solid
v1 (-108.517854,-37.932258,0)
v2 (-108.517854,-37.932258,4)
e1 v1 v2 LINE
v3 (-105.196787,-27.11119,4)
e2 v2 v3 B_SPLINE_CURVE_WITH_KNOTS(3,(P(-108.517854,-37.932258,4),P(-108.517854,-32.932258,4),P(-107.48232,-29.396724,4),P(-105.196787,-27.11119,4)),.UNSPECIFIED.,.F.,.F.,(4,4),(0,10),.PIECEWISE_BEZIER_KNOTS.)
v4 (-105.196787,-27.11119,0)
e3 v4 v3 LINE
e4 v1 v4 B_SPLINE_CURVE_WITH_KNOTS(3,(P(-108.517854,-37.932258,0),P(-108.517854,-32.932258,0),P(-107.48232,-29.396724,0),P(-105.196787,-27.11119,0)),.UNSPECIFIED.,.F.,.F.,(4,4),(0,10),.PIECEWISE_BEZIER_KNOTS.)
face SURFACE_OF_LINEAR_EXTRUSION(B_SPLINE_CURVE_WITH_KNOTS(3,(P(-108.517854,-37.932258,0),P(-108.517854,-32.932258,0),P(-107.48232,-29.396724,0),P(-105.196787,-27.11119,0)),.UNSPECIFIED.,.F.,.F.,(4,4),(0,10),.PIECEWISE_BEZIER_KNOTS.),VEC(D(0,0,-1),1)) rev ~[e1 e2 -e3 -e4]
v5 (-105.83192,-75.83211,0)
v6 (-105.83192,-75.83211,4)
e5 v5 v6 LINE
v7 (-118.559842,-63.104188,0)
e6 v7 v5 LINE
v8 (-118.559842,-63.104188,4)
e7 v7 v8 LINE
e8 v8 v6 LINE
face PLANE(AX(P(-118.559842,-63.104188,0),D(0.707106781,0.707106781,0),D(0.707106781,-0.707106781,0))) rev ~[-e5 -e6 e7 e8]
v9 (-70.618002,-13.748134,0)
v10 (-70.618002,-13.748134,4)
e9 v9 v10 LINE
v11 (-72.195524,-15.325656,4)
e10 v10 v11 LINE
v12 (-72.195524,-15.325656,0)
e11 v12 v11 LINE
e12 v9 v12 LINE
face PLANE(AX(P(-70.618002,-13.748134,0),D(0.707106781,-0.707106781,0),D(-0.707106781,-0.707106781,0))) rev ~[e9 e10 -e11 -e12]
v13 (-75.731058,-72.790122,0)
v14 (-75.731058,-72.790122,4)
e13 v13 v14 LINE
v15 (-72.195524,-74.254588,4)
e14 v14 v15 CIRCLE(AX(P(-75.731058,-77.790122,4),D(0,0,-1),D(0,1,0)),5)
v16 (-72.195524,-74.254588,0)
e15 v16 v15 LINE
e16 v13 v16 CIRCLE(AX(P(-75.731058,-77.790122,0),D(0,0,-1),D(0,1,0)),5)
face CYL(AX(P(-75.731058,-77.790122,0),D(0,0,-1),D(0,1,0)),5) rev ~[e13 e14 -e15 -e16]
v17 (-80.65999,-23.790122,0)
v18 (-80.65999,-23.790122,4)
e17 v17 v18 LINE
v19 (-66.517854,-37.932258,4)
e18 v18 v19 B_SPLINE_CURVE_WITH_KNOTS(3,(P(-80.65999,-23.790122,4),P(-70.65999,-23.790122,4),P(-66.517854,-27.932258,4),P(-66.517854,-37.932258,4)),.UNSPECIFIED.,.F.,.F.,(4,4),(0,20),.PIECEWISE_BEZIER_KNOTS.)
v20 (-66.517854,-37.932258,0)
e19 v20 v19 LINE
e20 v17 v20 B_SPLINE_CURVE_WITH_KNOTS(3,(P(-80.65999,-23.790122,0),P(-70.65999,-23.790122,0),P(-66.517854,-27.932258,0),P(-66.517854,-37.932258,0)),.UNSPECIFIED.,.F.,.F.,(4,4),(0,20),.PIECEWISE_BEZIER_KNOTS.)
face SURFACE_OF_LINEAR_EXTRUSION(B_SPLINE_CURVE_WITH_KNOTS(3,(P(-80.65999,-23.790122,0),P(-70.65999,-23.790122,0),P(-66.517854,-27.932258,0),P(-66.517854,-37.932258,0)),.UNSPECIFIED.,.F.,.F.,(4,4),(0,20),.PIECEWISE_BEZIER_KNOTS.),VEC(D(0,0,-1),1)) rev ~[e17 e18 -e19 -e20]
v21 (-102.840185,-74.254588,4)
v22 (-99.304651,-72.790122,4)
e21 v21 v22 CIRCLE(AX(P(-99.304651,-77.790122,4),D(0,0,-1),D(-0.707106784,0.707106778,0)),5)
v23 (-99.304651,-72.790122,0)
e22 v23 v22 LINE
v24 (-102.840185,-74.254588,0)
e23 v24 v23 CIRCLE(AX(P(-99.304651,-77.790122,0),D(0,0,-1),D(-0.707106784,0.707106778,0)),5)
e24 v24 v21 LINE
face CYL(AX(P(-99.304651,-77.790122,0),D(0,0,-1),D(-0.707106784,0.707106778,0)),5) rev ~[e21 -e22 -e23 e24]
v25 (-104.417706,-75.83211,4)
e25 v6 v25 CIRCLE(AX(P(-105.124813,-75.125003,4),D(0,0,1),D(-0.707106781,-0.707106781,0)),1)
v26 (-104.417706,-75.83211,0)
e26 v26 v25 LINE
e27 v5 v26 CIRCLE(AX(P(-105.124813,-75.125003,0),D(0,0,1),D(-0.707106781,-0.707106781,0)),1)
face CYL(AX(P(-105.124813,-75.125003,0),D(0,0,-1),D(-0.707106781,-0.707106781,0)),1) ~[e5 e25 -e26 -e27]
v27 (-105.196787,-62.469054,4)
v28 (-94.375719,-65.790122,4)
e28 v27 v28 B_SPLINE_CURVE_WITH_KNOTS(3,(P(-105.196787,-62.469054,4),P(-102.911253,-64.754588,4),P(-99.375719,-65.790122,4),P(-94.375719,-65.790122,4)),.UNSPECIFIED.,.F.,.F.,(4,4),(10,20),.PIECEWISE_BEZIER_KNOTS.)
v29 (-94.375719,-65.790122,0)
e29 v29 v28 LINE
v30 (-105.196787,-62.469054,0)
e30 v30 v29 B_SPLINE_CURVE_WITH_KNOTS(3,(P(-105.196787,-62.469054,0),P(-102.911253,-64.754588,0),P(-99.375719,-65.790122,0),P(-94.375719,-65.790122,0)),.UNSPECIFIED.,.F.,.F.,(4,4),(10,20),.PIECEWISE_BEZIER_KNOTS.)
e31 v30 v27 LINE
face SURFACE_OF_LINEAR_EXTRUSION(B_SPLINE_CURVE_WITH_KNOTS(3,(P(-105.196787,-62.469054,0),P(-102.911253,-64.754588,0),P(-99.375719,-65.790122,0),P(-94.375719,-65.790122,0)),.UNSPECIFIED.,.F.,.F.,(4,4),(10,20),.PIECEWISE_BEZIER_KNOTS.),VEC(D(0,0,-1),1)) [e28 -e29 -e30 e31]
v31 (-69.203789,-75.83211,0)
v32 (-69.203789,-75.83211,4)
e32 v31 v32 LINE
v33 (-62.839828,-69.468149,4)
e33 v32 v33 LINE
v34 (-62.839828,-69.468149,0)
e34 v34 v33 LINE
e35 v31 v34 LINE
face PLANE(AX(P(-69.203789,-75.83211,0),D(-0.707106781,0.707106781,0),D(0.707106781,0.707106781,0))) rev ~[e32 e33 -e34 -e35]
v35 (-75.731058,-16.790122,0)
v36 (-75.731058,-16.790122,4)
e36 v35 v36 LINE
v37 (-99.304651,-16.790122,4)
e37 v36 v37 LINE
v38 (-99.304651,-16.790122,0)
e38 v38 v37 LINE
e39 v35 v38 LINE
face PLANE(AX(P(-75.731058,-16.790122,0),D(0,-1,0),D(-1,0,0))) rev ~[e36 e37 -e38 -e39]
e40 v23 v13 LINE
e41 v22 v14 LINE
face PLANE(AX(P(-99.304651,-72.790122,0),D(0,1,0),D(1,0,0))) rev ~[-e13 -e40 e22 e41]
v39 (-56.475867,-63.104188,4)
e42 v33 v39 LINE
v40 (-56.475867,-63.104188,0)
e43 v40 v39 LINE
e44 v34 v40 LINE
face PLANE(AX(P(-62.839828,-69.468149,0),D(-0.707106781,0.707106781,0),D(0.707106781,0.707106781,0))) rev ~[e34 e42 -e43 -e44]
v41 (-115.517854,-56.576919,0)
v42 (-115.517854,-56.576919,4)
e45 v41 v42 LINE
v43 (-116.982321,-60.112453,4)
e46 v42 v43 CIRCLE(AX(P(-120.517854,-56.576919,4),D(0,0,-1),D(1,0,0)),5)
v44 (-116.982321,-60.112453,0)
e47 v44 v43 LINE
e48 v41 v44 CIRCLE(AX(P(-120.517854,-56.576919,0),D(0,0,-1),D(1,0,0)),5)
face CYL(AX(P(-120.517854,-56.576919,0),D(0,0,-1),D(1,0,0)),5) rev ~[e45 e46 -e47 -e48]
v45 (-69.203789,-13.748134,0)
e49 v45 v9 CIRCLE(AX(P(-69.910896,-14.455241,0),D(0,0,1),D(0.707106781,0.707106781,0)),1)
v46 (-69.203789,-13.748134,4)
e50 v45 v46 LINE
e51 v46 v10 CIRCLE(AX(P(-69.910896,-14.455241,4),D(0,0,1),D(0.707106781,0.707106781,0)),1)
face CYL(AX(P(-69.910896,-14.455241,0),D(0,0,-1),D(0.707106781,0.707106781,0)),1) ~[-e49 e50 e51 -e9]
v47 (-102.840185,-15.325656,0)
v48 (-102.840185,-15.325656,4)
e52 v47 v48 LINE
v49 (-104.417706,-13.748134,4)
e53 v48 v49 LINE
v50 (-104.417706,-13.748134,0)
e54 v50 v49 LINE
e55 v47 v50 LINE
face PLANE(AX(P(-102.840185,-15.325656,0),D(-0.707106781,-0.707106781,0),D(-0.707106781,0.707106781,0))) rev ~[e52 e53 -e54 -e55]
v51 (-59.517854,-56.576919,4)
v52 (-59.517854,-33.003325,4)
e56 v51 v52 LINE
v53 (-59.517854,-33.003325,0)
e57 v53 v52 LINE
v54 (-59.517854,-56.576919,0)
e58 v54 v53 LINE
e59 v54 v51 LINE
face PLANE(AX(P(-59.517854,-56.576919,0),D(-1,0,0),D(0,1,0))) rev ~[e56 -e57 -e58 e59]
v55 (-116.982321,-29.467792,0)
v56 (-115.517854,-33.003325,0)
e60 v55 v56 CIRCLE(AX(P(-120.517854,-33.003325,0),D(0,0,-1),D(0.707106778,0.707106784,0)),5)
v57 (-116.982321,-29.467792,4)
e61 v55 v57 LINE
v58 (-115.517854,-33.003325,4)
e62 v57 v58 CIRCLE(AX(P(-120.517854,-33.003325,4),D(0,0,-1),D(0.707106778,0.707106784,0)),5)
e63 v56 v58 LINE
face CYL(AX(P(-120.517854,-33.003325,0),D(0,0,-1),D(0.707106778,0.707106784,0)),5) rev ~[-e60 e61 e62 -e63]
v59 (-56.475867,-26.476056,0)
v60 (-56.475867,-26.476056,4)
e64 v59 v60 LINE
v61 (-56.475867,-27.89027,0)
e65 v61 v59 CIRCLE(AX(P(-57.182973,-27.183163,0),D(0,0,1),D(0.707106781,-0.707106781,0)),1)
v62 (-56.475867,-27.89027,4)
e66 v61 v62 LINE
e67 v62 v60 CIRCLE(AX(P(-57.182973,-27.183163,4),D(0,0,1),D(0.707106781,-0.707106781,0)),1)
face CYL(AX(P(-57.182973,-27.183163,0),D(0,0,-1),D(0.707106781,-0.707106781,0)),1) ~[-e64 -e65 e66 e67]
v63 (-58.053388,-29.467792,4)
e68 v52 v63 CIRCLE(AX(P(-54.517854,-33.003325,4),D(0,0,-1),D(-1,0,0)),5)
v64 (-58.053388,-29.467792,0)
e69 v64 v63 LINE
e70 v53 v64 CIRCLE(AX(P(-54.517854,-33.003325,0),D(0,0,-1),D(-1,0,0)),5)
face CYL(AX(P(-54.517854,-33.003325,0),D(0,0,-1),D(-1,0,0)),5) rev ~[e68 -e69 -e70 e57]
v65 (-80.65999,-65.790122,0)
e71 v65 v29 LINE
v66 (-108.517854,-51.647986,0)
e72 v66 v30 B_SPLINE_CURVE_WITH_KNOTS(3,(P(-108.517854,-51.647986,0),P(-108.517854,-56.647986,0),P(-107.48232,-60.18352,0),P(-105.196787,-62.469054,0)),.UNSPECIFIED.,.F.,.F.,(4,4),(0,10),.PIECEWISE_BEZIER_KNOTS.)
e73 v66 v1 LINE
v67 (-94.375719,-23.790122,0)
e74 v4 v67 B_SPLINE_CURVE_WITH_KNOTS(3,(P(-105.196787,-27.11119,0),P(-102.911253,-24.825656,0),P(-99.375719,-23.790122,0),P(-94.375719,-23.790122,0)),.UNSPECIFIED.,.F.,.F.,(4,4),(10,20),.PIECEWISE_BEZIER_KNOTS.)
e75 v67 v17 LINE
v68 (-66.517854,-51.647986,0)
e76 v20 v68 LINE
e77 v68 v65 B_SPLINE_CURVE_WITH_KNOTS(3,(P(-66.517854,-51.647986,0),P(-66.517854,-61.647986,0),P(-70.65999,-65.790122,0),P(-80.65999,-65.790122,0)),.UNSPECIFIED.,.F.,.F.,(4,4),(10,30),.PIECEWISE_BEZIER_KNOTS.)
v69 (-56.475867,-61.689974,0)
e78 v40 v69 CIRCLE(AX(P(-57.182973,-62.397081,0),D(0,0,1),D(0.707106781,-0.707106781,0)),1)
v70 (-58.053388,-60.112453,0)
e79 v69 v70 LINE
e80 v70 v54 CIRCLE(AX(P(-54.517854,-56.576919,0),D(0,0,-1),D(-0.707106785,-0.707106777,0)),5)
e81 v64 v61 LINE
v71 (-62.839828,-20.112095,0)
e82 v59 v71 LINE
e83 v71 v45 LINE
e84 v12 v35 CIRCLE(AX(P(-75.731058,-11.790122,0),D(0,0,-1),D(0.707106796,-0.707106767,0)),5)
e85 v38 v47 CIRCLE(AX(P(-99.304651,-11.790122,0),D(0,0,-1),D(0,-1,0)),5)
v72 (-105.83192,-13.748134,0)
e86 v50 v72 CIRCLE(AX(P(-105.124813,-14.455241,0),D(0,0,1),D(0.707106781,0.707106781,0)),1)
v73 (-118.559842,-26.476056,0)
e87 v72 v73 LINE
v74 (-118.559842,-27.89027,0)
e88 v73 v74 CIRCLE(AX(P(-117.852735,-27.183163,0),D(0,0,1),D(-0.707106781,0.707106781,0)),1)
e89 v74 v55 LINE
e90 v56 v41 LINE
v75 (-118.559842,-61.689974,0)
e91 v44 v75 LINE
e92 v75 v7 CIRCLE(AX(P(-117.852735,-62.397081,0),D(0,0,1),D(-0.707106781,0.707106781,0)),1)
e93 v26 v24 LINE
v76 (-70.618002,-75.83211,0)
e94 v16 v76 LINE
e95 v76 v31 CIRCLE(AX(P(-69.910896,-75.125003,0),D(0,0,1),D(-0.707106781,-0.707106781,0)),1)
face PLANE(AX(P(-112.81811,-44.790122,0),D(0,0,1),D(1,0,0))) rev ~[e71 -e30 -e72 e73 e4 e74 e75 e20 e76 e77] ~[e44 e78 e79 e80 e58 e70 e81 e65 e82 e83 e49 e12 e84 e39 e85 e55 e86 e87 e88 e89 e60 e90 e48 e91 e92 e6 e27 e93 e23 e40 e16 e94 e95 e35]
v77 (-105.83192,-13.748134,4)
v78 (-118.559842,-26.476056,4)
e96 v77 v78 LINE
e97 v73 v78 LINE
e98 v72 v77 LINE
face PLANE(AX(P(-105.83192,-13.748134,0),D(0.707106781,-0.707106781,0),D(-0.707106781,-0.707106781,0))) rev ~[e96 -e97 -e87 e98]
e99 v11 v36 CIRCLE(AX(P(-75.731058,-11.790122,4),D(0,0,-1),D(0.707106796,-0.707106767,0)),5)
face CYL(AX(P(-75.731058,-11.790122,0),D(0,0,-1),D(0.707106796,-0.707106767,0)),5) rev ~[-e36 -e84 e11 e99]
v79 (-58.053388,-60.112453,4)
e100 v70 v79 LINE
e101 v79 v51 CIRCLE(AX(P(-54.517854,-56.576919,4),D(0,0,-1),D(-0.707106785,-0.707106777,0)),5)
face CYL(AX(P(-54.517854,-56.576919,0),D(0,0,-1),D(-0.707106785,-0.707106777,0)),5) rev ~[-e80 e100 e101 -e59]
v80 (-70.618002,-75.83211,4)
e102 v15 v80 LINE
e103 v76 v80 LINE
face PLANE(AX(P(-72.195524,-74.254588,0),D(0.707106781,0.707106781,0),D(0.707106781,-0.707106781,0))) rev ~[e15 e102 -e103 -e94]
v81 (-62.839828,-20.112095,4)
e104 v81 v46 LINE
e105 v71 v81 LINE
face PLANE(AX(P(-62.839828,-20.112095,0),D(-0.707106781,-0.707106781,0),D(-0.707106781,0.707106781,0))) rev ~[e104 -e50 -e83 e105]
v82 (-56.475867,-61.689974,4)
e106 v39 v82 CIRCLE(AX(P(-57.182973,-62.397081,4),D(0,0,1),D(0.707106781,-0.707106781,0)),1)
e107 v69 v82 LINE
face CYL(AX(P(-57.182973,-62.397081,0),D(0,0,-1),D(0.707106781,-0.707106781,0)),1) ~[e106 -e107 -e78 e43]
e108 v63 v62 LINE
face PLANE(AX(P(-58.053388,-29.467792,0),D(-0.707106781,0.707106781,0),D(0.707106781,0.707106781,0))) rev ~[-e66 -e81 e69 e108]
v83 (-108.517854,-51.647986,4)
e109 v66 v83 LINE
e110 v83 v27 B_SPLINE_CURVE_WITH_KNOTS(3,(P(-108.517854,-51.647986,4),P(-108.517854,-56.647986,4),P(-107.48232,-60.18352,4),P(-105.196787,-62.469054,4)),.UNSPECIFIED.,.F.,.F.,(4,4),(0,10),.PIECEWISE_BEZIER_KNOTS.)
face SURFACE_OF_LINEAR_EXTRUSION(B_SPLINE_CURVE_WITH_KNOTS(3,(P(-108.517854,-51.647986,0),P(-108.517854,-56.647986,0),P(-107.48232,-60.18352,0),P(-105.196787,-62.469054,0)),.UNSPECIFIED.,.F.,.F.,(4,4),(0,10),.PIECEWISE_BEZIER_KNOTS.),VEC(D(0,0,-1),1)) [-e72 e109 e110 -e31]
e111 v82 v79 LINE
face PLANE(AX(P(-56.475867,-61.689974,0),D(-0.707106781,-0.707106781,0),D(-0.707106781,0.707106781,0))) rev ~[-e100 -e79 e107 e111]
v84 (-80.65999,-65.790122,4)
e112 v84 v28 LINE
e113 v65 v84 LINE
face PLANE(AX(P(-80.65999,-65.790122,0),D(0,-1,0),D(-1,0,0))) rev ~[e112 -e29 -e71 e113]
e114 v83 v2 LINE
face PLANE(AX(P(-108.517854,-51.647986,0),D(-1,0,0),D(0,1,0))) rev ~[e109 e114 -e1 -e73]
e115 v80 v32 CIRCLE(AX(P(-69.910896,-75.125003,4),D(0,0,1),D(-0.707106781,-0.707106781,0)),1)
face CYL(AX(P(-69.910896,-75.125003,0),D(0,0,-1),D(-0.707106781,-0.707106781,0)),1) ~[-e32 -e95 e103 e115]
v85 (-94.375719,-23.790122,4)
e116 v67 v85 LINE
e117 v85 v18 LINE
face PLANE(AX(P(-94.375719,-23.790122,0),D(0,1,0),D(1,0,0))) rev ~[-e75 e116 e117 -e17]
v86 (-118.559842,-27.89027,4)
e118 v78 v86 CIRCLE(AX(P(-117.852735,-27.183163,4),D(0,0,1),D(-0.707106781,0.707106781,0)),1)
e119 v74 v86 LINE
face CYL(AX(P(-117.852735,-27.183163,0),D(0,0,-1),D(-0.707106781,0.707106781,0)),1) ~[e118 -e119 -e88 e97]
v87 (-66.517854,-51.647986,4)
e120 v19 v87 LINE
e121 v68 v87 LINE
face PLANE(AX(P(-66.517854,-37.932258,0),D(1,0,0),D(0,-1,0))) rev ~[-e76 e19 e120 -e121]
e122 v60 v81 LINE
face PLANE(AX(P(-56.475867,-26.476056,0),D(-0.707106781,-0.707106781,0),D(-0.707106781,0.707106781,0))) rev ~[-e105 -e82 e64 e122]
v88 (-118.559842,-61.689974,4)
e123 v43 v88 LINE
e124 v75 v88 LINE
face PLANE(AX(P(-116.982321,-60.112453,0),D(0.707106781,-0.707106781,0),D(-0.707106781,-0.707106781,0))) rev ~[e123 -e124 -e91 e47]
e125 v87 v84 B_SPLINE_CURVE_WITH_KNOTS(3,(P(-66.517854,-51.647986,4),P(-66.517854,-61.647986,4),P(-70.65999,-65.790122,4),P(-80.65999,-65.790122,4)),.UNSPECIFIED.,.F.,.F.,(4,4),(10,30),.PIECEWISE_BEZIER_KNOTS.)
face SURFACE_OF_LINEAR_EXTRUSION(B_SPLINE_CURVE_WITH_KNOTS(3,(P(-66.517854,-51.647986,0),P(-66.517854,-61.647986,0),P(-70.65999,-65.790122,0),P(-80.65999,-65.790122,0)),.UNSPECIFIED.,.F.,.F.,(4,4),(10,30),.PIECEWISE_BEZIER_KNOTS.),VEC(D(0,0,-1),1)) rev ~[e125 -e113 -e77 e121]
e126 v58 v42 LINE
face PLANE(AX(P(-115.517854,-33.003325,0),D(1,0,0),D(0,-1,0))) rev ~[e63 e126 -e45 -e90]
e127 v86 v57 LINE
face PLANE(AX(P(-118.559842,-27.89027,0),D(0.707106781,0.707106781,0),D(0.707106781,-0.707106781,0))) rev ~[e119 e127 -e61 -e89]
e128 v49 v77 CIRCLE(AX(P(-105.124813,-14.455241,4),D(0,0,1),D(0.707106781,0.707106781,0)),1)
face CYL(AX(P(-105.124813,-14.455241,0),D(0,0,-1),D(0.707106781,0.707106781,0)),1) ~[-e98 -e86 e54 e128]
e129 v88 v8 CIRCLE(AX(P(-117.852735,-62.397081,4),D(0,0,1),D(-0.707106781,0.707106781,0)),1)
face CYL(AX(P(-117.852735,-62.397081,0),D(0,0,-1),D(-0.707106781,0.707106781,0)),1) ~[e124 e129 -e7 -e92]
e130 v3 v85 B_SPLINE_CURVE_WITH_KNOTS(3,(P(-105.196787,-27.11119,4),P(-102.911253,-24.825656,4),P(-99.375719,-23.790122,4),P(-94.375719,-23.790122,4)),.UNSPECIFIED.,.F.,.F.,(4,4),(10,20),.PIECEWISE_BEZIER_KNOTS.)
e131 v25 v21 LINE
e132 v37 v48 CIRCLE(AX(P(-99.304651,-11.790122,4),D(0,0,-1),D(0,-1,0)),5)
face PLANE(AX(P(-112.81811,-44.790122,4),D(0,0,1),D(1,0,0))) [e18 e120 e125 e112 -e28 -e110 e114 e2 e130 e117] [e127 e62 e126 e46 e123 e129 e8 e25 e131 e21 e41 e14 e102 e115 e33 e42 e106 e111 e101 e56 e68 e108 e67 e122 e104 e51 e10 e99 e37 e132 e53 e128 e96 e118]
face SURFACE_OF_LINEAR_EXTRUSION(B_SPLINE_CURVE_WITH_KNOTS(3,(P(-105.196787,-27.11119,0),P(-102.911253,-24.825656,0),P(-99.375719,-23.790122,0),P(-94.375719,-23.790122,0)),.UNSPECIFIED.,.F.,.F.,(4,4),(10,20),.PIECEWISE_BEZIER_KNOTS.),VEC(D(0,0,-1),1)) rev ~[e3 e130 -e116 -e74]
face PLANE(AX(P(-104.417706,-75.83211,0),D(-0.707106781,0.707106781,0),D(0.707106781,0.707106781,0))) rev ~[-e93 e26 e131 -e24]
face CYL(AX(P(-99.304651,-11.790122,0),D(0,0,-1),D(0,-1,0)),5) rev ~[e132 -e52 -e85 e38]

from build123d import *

# Parameters (mm, degrees)
F1_DEPTH = 4


# Not quite as in the source:
# - a feature names something its author has since deleted; it is built from what else it names


with BuildPart() as f1:
    # F0 (on Top) → F1 (new body)
    with BuildSketch(Plane.XY):
        Polygon((-108.5178543984, -51.6479864335), (-108.5178543984, -37.9322576809), (-115.5178543984, -30.9322576809), (-115.5178543984, -33.0033254928), (-115.5178543984, -56.5769186216), (-115.5178543984, -58.6479864335), align=None)
        with BuildLine():
            Line((-115.5178543984, -33.0033254928), (-115.5178543984, -30.9322576809))
            Line((-115.5178543984, -30.9322576809), (-116.982320508, -29.4677915713))
            ThreePointArc((-116.982320508, -29.4677915713), (-115.89845674, -31.0899083208), (-115.5178543984, -33.0033254928))
        make_face()
        with BuildLine():
            Line((-58.0533882883, -29.4677915708), (-59.5178543984, -30.9322576809))
            Line((-59.5178543984, -30.9322576809), (-59.5178543984, -33.0033254928))
            ThreePointArc((-59.5178543984, -33.0033254928), (-59.1372520566, -31.0899083205), (-58.0533882883, -29.4677915708))
        make_face()
        Polygon((-66.5178543984, -37.9322576809), (-66.5178543984, -51.6479864335), (-59.5178543984, -58.6479864335), (-59.5178543984, -56.5769186216), (-59.5178543984, -33.0033254928), (-59.5178543984, -30.9322576809), align=None)
        with BuildLine():
            Line((-59.5178543984, -56.5769186216), (-59.5178543984, -58.6479864335))
            Line((-59.5178543984, -58.6479864335), (-58.0533883237, -60.1124525081))
            ThreePointArc((-58.0533883237, -60.1124525081), (-59.1372520662, -58.4903357707), (-59.5178543984, -56.5769186216))
        make_face()
        with BuildLine():
            Line((-116.982320508, -60.1124525431), (-115.5178543984, -58.6479864335))
            Line((-115.5178543984, -58.6479864335), (-115.5178543984, -56.5769186216))
            ThreePointArc((-115.5178543984, -56.5769186216), (-115.89845674, -58.4903357936), (-116.982320508, -60.1124525431))
        make_face()
        Polygon((-101.3757187746, -16.7901220572), (-94.3757187746, -23.7901220572), (-80.6599900221, -23.7901220572), (-73.6599900221, -16.7901220572), (-75.731057834, -16.7901220572), (-99.3046509628, -16.7901220572), align=None)
        with BuildLine():
            Line((-102.8401848842, -15.3256559476), (-101.3757187746, -16.7901220572))
            Line((-101.3757187746, -16.7901220572), (-99.3046509628, -16.7901220572))
            ThreePointArc((-99.3046509628, -16.7901220572), (-101.2180681347, -16.4095197156), (-102.8401848842, -15.3256559476))
        make_face()
        with BuildLine():
            Line((-75.731057834, -16.7901220572), (-73.6599900221, -16.7901220572))
            Line((-73.6599900221, -16.7901220572), (-72.1955238561, -15.3256558912))
            ThreePointArc((-72.1955238561, -15.3256558912), (-73.8176406251, -16.4095197003), (-75.731057834, -16.7901220572))
        make_face()
        Polygon((-73.6599900221, -72.7901220572), (-80.6599900221, -65.7901220572), (-94.3757187746, -65.7901220572), (-101.3757187746, -72.7901220572), (-99.3046509628, -72.7901220572), (-75.731057834, -72.7901220572), align=None)
        with BuildLine():
            Line((-99.3046509628, -72.7901220572), (-101.3757187746, -72.7901220572))
            Line((-101.3757187746, -72.7901220572), (-102.8401848842, -74.2545881668))
            ThreePointArc((-102.8401848842, -74.2545881668), (-101.2180681347, -73.1707243988), (-99.3046509628, -72.7901220572))
        make_face()
        with BuildLine():
            Line((-72.1955239691, -74.2545881102), (-73.6599900221, -72.7901220572))
            Line((-73.6599900221, -72.7901220572), (-75.731057834, -72.7901220572))
            ThreePointArc((-75.731057834, -72.7901220572), (-73.8176406989, -73.1707243835), (-72.1955239691, -74.2545881102))
        make_face()
        with BuildLine():
            Line((-105.1967865865, -27.1111898691), (-112.1958810618, -20.1120953938))
            Line((-112.1958810618, -20.1120953938), (-118.5598420925, -26.4760564245))
            ThreePointArc((-118.5598420925, -26.4760564245), (-118.8527353113, -27.1831632057), (-118.5598420925, -27.8902699868))
            Line((-118.5598420925, -27.8902699868), (-116.982320508, -29.4677915713))
            Line((-116.982320508, -29.4677915713), (-115.5178543984, -30.9322576809))
            Line((-115.5178543984, -30.9322576809), (-108.5178543984, -37.9322576809))
            add(Edge.make_bspline(
                [(-108.5178543984, -37.9322576809), (-108.5178543984, -32.9322576809), (-107.4823204924, -29.396723775), (-105.1967865865, -27.1111898691)],
                knots=[0, 0, 0, 0, 10, 10, 10, 10], degree=3))
        make_face()
        with BuildLine():
            Line((-105.8319200311, -13.7481343631), (-112.1958810618, -20.1120953938))
            Line((-112.1958810618, -20.1120953938), (-105.1967865865, -27.1111898691))
            add(Edge.make_bspline(
                [(-105.1967865865, -27.1111898691), (-102.9112526806, -24.8256559631), (-99.3757187746, -23.7901220572), (-94.3757187746, -23.7901220572)],
                knots=[10, 10, 10, 10, 20, 20, 20, 20], degree=3))
            Line((-94.3757187746, -23.7901220572), (-101.3757187746, -16.7901220572))
            Line((-101.3757187746, -16.7901220572), (-102.8401848842, -15.3256559476))
            Line((-102.8401848842, -15.3256559476), (-104.4177064687, -13.7481343631))
            ThreePointArc((-104.4177064687, -13.7481343631), (-105.1248132499, -13.4552411443), (-105.8319200311, -13.7481343631))
        make_face()
        with BuildLine():
            Line((-73.6599900221, -16.7901220572), (-80.6599900221, -23.7901220572))
            add(Edge.make_bspline(
                [(-80.6599900221, -23.7901220572), (-75.6599900221, -23.7901220572), (-72.1244561162, -24.8256559631), (-69.8389222102, -27.1111898691)],
                knots=[0, 0, 0, 0, 10, 10, 10, 10], degree=3))
            Line((-69.8389222102, -27.1111898691), (-62.839827735, -20.1120953938))
            Line((-62.839827735, -20.1120953938), (-69.2037887656, -13.7481343631))
            ThreePointArc((-69.2037887656, -13.7481343631), (-69.9108955468, -13.4552411443), (-70.618002328, -13.7481343631))
            Line((-70.618002328, -13.7481343631), (-72.1955238561, -15.3256558912))
            Line((-72.1955238561, -15.3256558912), (-73.6599900221, -16.7901220572))
        make_face()
        with BuildLine():
            Line((-62.839827735, -20.1120953938), (-69.8389222102, -27.1111898691))
            add(Edge.make_bspline(
                [(-69.8389222102, -27.1111898691), (-67.5533883043, -29.396723775), (-66.5178543984, -32.9322576809), (-66.5178543984, -37.9322576809)],
                knots=[10, 10, 10, 10, 20, 20, 20, 20], degree=3))
            Line((-66.5178543984, -37.9322576809), (-59.5178543984, -30.9322576809))
            Line((-59.5178543984, -30.9322576809), (-58.0533882883, -29.4677915708))
            Line((-58.0533882883, -29.4677915708), (-56.4758667043, -27.8902699868))
            ThreePointArc((-56.4758667043, -27.8902699868), (-56.1829734855, -27.1831632057), (-56.4758667043, -26.4760564245))
            Line((-56.4758667043, -26.4760564245), (-62.839827735, -20.1120953938))
        make_face()
        with BuildLine():
            add(Edge.make_bspline(
                [(-69.8389222102, -62.4690542453), (-67.5533883043, -60.1835203394), (-66.5178543984, -56.6479864335), (-66.5178543984, -51.6479864335)],
                knots=[10, 10, 10, 10, 20, 20, 20, 20], degree=3))
            Line((-69.8389222102, -62.4690542453), (-62.839827735, -69.4681487206))
            Line((-62.839827735, -69.4681487206), (-56.4758667043, -63.1041876899))
            ThreePointArc((-56.4758667043, -63.1041876899), (-56.1829734855, -62.3970809087), (-56.4758667043, -61.6899741276))
            Line((-56.4758667043, -61.6899741276), (-58.0533883237, -60.1124525081))
            Line((-58.0533883237, -60.1124525081), (-59.5178543984, -58.6479864335))
            Line((-59.5178543984, -58.6479864335), (-66.5178543984, -51.6479864335))
        make_face()
        with BuildLine():
            Line((-62.839827735, -69.4681487206), (-69.8389222102, -62.4690542453))
            add(Edge.make_bspline(
                [(-80.6599900221, -65.7901220572), (-75.6599900221, -65.7901220572), (-72.1244561162, -64.7545881513), (-69.8389222102, -62.4690542453)],
                knots=[0, 0, 0, 0, 10, 10, 10, 10], degree=3))
            Line((-80.6599900221, -65.7901220572), (-73.6599900221, -72.7901220572))
            Line((-73.6599900221, -72.7901220572), (-72.1955239691, -74.2545881102))
            Line((-72.1955239691, -74.2545881102), (-70.618002328, -75.8321097513))
            ThreePointArc((-70.618002328, -75.8321097513), (-69.9108955468, -76.1250029701), (-69.2037887656, -75.8321097513))
            Line((-69.2037887656, -75.8321097513), (-62.839827735, -69.4681487206))
        make_face()
        with BuildLine():
            add(Edge.make_bspline(
                [(-105.1967865865, -62.4690542453), (-102.9112526806, -64.7545881513), (-99.3757187746, -65.7901220572), (-94.3757187746, -65.7901220572)],
                knots=[10, 10, 10, 10, 20, 20, 20, 20], degree=3))
            Line((-105.1967865865, -62.4690542453), (-112.1958810618, -69.4681487206))
            Line((-112.1958810618, -69.4681487206), (-105.8319200311, -75.8321097513))
            ThreePointArc((-105.8319200311, -75.8321097513), (-105.1248132499, -76.1250029701), (-104.4177064687, -75.8321097513))
            Line((-104.4177064687, -75.8321097513), (-102.8401848842, -74.2545881668))
            Line((-102.8401848842, -74.2545881668), (-101.3757187746, -72.7901220572))
            Line((-101.3757187746, -72.7901220572), (-94.3757187746, -65.7901220572))
        make_face()
        with BuildLine():
            add(Edge.make_bspline(
                [(-108.5178543984, -51.6479864335), (-108.5178543984, -56.6479864335), (-107.4823204924, -60.1835203394), (-105.1967865865, -62.4690542453)],
                knots=[0, 0, 0, 0, 10, 10, 10, 10], degree=3))
            Line((-108.5178543984, -51.6479864335), (-115.5178543984, -58.6479864335))
            Line((-115.5178543984, -58.6479864335), (-116.982320508, -60.1124525431))
            Line((-116.982320508, -60.1124525431), (-118.5598420925, -61.6899741276))
            ThreePointArc((-118.5598420925, -61.6899741276), (-118.8527353113, -62.3970809087), (-118.5598420925, -63.1041876899))
            Line((-118.5598420925, -63.1041876899), (-112.1958810618, -69.4681487206))
            Line((-112.1958810618, -69.4681487206), (-105.1967865865, -62.4690542453))
        make_face()
    extrude(amount=F1_DEPTH)


solid = f1.part
